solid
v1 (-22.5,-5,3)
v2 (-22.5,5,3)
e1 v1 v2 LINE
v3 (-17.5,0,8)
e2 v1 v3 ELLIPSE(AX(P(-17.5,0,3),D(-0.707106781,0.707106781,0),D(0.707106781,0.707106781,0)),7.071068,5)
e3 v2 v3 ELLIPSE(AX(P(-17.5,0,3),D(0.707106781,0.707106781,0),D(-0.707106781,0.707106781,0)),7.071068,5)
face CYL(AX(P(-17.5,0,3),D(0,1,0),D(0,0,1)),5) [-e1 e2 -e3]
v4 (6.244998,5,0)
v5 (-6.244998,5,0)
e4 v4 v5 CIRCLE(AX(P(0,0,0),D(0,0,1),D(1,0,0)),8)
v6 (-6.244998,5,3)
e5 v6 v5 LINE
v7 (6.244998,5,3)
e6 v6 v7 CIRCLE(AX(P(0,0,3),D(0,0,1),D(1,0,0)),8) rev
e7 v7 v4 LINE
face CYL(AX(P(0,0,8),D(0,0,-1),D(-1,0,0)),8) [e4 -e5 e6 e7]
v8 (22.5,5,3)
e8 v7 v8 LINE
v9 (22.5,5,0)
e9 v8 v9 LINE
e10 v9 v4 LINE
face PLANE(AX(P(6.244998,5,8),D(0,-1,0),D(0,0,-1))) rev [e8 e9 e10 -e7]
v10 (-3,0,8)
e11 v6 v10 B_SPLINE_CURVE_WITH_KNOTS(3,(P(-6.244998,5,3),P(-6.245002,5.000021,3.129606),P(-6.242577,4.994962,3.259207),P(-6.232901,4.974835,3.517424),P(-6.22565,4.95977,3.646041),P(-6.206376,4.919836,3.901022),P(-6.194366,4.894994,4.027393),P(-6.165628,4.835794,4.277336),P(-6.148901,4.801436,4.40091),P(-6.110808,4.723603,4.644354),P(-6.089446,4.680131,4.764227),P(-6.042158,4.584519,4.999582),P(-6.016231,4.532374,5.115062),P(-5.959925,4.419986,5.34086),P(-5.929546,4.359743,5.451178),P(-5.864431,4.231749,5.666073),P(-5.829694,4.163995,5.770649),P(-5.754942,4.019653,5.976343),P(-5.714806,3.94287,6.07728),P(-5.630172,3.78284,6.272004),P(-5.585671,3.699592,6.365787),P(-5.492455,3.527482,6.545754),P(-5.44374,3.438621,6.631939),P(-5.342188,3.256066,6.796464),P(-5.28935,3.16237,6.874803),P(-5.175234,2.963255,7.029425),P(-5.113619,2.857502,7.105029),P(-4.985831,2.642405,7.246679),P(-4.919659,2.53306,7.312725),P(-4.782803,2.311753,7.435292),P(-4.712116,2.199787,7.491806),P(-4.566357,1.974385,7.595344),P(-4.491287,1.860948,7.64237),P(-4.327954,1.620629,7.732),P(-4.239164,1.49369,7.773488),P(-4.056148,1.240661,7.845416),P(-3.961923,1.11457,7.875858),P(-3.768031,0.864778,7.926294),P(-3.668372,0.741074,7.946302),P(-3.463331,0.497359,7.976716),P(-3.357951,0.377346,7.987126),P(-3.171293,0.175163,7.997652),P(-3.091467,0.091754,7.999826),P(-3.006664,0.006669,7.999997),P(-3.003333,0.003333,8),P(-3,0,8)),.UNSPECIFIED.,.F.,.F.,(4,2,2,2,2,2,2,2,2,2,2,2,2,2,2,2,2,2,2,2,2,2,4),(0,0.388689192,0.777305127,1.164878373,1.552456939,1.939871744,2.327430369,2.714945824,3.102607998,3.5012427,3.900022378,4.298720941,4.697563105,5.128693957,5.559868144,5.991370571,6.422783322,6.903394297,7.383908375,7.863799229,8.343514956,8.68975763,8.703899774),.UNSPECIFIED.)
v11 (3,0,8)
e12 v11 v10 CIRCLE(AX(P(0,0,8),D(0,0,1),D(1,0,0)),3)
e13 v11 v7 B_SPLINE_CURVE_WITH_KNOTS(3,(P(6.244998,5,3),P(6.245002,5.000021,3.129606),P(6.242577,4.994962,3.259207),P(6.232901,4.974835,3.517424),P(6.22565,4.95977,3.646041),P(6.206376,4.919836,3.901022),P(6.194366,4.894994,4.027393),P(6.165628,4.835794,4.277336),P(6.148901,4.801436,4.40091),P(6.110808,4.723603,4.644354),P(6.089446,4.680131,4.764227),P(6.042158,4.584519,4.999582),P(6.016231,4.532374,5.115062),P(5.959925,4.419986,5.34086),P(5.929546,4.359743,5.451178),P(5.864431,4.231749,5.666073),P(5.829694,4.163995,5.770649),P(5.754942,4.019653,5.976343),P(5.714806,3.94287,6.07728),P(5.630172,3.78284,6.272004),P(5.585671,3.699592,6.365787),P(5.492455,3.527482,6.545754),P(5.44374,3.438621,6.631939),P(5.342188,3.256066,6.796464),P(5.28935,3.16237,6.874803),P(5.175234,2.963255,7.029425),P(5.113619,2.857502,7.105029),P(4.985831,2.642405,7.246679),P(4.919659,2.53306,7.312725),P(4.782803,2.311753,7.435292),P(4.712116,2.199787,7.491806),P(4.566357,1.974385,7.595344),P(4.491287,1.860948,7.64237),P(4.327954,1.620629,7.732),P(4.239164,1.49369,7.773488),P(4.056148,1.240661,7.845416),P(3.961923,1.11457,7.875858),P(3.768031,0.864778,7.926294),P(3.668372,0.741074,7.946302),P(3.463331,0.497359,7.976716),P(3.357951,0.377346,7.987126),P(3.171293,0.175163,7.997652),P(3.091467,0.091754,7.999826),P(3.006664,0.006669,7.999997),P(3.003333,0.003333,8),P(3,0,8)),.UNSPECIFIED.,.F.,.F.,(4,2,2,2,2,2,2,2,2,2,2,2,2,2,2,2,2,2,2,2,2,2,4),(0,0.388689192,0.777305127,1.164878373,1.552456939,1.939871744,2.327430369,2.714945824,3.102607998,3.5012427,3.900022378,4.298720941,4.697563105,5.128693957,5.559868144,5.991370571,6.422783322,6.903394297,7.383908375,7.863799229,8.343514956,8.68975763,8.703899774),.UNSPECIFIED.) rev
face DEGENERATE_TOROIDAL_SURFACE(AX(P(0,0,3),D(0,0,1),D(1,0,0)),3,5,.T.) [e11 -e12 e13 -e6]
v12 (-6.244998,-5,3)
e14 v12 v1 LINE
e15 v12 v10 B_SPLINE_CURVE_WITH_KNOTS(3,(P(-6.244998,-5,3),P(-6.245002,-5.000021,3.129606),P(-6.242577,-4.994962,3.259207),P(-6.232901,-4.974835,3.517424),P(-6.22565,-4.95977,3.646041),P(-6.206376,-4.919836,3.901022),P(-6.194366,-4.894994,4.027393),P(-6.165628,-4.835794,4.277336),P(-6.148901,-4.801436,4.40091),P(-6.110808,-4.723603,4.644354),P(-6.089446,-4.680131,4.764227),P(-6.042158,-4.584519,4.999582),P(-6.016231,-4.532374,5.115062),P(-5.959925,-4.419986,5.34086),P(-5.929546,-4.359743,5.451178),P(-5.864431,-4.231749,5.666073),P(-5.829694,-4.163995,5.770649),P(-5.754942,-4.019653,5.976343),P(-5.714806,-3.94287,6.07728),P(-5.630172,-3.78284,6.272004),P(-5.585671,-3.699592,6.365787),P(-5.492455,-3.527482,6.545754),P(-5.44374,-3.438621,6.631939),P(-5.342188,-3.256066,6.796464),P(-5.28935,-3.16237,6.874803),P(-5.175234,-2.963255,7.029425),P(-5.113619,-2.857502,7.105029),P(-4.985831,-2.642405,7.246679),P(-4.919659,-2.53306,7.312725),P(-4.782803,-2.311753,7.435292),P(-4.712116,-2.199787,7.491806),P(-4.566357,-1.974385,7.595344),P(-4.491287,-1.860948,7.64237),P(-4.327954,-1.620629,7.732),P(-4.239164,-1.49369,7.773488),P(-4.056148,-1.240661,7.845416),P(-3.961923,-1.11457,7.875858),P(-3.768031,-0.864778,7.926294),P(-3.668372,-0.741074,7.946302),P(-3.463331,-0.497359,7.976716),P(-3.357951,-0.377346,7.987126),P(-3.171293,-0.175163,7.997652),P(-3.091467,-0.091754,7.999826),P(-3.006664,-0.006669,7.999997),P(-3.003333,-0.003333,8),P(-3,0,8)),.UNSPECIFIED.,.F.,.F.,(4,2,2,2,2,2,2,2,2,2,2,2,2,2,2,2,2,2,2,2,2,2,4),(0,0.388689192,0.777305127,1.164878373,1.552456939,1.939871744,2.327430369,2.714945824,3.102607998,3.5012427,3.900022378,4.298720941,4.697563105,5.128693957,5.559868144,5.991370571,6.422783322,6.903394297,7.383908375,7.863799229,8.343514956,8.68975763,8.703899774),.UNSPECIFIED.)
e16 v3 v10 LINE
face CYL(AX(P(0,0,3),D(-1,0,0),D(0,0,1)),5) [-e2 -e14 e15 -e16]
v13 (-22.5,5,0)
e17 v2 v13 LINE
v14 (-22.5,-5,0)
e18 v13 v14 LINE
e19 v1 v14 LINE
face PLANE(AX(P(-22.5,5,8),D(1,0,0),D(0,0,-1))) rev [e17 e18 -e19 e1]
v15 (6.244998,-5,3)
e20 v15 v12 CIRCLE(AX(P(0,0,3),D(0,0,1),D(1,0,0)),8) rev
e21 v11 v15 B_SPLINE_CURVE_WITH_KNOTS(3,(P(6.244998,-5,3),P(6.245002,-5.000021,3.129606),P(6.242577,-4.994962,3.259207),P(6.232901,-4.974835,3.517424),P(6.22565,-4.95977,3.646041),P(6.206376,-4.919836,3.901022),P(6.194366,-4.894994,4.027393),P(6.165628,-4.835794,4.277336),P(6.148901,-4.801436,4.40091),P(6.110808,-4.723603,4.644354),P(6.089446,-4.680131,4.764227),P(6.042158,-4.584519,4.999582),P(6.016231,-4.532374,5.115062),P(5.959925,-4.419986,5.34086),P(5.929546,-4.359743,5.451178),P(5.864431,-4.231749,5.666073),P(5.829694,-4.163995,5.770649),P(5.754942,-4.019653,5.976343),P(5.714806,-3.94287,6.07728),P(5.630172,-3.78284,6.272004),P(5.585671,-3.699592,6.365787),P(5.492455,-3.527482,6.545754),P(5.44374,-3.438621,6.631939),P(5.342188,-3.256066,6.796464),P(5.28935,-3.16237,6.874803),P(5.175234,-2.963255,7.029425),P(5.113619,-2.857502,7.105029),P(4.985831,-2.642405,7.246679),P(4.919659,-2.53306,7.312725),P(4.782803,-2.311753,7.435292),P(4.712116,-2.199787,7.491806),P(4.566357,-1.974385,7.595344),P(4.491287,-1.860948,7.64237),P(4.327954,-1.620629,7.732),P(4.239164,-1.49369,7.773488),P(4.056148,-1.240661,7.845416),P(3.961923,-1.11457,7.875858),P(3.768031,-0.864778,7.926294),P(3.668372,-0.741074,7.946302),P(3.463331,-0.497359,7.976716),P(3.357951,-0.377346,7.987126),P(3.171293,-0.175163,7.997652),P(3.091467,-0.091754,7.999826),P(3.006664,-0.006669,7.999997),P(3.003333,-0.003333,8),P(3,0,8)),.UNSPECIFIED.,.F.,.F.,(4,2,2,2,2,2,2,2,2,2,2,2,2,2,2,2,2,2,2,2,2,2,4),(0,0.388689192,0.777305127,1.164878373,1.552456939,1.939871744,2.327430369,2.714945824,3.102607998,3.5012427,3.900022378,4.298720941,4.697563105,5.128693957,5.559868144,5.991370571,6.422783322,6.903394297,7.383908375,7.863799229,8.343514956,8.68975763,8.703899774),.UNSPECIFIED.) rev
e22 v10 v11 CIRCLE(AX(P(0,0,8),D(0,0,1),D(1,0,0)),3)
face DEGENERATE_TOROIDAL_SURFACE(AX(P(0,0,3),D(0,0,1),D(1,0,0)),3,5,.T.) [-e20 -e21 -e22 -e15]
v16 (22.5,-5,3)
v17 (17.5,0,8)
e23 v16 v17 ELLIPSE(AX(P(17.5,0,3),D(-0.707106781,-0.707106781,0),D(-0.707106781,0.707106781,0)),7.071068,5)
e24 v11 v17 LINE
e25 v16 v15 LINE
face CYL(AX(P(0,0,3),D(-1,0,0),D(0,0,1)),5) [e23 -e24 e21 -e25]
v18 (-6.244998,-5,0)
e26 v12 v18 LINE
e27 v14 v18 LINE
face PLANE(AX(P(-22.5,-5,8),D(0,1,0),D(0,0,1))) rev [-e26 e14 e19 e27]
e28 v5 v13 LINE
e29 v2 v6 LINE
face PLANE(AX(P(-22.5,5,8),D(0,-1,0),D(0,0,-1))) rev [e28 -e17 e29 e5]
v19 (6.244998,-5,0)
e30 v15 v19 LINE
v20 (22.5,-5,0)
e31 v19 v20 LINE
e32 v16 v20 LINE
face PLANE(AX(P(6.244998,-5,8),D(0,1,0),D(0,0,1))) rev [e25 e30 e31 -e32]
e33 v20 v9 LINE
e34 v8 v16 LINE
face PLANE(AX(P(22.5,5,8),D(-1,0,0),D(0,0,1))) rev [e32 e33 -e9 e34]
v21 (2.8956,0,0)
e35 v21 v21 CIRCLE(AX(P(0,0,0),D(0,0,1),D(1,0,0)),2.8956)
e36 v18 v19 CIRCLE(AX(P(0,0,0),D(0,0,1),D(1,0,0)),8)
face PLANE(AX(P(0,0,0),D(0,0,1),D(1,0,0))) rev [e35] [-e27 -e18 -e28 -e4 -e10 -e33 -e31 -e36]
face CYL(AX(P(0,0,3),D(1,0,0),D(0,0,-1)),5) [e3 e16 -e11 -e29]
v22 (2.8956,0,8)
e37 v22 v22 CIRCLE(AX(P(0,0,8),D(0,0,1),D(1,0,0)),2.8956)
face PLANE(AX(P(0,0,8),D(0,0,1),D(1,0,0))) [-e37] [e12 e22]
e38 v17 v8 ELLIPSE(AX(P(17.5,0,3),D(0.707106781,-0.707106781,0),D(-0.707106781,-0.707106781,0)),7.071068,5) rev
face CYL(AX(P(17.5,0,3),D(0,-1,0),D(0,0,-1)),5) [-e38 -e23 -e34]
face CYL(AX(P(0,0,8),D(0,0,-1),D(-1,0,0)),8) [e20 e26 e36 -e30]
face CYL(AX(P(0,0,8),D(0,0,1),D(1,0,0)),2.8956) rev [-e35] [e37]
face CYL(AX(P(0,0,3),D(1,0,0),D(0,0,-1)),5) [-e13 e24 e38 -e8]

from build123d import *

# Parameters (mm, degrees)
BOSS_EXTRU_2_DEPTH = 8
CONG_1_R           = 5
D_GAGEMENT_121_D   = 5.7912


with BuildPart() as part:
    # Esquisse1 → Boss.-Extru.2 (new body)
    with BuildSketch(Plane.XY):
        with BuildLine():
            Line((-22.5, 5), (-6.244997998, 5))
            ThreePointArc((-6.244997998, 5), (0, 8), (6.244997998, 5))
            Line((6.244997998, 5), (22.5, 5))
            Line((22.5, 5), (22.5, -5))
            Line((22.5, -5), (6.244997998, -5))
            ThreePointArc((6.244997998, -5), (0, -8), (-6.244997998, -5))
            Line((-6.244997998, -5), (-22.5, -5))
            Line((-22.5, -5), (-22.5, 5))
        make_face()
    extrude(amount=BOSS_EXTRU_2_DEPTH)

    # Congé1
    cong_1_edges = [part.edges().sort_by_distance(p)[0] for p in [
        (0, -8, 8),
        (14.372498999, -5, 8),
        (22.5, 0, 8),
        (14.372498999, 5, 8),
        (0, 8, 8),
        (-14.372498999, 5, 8),
        (-22.5, 0, 8),
        (-14.372498999, -5, 8),
    ]]
    fillet(cong_1_edges, radius=CONG_1_R - 0.0001)  # a hair under: the kernel refuses the full size

    # Dégagement #121 (through all)
    with Locations(Plane.XY.offset(8)):
        with Locations((0, 0)):
            Hole(D_GAGEMENT_121_D / 2)


solid = part.part
